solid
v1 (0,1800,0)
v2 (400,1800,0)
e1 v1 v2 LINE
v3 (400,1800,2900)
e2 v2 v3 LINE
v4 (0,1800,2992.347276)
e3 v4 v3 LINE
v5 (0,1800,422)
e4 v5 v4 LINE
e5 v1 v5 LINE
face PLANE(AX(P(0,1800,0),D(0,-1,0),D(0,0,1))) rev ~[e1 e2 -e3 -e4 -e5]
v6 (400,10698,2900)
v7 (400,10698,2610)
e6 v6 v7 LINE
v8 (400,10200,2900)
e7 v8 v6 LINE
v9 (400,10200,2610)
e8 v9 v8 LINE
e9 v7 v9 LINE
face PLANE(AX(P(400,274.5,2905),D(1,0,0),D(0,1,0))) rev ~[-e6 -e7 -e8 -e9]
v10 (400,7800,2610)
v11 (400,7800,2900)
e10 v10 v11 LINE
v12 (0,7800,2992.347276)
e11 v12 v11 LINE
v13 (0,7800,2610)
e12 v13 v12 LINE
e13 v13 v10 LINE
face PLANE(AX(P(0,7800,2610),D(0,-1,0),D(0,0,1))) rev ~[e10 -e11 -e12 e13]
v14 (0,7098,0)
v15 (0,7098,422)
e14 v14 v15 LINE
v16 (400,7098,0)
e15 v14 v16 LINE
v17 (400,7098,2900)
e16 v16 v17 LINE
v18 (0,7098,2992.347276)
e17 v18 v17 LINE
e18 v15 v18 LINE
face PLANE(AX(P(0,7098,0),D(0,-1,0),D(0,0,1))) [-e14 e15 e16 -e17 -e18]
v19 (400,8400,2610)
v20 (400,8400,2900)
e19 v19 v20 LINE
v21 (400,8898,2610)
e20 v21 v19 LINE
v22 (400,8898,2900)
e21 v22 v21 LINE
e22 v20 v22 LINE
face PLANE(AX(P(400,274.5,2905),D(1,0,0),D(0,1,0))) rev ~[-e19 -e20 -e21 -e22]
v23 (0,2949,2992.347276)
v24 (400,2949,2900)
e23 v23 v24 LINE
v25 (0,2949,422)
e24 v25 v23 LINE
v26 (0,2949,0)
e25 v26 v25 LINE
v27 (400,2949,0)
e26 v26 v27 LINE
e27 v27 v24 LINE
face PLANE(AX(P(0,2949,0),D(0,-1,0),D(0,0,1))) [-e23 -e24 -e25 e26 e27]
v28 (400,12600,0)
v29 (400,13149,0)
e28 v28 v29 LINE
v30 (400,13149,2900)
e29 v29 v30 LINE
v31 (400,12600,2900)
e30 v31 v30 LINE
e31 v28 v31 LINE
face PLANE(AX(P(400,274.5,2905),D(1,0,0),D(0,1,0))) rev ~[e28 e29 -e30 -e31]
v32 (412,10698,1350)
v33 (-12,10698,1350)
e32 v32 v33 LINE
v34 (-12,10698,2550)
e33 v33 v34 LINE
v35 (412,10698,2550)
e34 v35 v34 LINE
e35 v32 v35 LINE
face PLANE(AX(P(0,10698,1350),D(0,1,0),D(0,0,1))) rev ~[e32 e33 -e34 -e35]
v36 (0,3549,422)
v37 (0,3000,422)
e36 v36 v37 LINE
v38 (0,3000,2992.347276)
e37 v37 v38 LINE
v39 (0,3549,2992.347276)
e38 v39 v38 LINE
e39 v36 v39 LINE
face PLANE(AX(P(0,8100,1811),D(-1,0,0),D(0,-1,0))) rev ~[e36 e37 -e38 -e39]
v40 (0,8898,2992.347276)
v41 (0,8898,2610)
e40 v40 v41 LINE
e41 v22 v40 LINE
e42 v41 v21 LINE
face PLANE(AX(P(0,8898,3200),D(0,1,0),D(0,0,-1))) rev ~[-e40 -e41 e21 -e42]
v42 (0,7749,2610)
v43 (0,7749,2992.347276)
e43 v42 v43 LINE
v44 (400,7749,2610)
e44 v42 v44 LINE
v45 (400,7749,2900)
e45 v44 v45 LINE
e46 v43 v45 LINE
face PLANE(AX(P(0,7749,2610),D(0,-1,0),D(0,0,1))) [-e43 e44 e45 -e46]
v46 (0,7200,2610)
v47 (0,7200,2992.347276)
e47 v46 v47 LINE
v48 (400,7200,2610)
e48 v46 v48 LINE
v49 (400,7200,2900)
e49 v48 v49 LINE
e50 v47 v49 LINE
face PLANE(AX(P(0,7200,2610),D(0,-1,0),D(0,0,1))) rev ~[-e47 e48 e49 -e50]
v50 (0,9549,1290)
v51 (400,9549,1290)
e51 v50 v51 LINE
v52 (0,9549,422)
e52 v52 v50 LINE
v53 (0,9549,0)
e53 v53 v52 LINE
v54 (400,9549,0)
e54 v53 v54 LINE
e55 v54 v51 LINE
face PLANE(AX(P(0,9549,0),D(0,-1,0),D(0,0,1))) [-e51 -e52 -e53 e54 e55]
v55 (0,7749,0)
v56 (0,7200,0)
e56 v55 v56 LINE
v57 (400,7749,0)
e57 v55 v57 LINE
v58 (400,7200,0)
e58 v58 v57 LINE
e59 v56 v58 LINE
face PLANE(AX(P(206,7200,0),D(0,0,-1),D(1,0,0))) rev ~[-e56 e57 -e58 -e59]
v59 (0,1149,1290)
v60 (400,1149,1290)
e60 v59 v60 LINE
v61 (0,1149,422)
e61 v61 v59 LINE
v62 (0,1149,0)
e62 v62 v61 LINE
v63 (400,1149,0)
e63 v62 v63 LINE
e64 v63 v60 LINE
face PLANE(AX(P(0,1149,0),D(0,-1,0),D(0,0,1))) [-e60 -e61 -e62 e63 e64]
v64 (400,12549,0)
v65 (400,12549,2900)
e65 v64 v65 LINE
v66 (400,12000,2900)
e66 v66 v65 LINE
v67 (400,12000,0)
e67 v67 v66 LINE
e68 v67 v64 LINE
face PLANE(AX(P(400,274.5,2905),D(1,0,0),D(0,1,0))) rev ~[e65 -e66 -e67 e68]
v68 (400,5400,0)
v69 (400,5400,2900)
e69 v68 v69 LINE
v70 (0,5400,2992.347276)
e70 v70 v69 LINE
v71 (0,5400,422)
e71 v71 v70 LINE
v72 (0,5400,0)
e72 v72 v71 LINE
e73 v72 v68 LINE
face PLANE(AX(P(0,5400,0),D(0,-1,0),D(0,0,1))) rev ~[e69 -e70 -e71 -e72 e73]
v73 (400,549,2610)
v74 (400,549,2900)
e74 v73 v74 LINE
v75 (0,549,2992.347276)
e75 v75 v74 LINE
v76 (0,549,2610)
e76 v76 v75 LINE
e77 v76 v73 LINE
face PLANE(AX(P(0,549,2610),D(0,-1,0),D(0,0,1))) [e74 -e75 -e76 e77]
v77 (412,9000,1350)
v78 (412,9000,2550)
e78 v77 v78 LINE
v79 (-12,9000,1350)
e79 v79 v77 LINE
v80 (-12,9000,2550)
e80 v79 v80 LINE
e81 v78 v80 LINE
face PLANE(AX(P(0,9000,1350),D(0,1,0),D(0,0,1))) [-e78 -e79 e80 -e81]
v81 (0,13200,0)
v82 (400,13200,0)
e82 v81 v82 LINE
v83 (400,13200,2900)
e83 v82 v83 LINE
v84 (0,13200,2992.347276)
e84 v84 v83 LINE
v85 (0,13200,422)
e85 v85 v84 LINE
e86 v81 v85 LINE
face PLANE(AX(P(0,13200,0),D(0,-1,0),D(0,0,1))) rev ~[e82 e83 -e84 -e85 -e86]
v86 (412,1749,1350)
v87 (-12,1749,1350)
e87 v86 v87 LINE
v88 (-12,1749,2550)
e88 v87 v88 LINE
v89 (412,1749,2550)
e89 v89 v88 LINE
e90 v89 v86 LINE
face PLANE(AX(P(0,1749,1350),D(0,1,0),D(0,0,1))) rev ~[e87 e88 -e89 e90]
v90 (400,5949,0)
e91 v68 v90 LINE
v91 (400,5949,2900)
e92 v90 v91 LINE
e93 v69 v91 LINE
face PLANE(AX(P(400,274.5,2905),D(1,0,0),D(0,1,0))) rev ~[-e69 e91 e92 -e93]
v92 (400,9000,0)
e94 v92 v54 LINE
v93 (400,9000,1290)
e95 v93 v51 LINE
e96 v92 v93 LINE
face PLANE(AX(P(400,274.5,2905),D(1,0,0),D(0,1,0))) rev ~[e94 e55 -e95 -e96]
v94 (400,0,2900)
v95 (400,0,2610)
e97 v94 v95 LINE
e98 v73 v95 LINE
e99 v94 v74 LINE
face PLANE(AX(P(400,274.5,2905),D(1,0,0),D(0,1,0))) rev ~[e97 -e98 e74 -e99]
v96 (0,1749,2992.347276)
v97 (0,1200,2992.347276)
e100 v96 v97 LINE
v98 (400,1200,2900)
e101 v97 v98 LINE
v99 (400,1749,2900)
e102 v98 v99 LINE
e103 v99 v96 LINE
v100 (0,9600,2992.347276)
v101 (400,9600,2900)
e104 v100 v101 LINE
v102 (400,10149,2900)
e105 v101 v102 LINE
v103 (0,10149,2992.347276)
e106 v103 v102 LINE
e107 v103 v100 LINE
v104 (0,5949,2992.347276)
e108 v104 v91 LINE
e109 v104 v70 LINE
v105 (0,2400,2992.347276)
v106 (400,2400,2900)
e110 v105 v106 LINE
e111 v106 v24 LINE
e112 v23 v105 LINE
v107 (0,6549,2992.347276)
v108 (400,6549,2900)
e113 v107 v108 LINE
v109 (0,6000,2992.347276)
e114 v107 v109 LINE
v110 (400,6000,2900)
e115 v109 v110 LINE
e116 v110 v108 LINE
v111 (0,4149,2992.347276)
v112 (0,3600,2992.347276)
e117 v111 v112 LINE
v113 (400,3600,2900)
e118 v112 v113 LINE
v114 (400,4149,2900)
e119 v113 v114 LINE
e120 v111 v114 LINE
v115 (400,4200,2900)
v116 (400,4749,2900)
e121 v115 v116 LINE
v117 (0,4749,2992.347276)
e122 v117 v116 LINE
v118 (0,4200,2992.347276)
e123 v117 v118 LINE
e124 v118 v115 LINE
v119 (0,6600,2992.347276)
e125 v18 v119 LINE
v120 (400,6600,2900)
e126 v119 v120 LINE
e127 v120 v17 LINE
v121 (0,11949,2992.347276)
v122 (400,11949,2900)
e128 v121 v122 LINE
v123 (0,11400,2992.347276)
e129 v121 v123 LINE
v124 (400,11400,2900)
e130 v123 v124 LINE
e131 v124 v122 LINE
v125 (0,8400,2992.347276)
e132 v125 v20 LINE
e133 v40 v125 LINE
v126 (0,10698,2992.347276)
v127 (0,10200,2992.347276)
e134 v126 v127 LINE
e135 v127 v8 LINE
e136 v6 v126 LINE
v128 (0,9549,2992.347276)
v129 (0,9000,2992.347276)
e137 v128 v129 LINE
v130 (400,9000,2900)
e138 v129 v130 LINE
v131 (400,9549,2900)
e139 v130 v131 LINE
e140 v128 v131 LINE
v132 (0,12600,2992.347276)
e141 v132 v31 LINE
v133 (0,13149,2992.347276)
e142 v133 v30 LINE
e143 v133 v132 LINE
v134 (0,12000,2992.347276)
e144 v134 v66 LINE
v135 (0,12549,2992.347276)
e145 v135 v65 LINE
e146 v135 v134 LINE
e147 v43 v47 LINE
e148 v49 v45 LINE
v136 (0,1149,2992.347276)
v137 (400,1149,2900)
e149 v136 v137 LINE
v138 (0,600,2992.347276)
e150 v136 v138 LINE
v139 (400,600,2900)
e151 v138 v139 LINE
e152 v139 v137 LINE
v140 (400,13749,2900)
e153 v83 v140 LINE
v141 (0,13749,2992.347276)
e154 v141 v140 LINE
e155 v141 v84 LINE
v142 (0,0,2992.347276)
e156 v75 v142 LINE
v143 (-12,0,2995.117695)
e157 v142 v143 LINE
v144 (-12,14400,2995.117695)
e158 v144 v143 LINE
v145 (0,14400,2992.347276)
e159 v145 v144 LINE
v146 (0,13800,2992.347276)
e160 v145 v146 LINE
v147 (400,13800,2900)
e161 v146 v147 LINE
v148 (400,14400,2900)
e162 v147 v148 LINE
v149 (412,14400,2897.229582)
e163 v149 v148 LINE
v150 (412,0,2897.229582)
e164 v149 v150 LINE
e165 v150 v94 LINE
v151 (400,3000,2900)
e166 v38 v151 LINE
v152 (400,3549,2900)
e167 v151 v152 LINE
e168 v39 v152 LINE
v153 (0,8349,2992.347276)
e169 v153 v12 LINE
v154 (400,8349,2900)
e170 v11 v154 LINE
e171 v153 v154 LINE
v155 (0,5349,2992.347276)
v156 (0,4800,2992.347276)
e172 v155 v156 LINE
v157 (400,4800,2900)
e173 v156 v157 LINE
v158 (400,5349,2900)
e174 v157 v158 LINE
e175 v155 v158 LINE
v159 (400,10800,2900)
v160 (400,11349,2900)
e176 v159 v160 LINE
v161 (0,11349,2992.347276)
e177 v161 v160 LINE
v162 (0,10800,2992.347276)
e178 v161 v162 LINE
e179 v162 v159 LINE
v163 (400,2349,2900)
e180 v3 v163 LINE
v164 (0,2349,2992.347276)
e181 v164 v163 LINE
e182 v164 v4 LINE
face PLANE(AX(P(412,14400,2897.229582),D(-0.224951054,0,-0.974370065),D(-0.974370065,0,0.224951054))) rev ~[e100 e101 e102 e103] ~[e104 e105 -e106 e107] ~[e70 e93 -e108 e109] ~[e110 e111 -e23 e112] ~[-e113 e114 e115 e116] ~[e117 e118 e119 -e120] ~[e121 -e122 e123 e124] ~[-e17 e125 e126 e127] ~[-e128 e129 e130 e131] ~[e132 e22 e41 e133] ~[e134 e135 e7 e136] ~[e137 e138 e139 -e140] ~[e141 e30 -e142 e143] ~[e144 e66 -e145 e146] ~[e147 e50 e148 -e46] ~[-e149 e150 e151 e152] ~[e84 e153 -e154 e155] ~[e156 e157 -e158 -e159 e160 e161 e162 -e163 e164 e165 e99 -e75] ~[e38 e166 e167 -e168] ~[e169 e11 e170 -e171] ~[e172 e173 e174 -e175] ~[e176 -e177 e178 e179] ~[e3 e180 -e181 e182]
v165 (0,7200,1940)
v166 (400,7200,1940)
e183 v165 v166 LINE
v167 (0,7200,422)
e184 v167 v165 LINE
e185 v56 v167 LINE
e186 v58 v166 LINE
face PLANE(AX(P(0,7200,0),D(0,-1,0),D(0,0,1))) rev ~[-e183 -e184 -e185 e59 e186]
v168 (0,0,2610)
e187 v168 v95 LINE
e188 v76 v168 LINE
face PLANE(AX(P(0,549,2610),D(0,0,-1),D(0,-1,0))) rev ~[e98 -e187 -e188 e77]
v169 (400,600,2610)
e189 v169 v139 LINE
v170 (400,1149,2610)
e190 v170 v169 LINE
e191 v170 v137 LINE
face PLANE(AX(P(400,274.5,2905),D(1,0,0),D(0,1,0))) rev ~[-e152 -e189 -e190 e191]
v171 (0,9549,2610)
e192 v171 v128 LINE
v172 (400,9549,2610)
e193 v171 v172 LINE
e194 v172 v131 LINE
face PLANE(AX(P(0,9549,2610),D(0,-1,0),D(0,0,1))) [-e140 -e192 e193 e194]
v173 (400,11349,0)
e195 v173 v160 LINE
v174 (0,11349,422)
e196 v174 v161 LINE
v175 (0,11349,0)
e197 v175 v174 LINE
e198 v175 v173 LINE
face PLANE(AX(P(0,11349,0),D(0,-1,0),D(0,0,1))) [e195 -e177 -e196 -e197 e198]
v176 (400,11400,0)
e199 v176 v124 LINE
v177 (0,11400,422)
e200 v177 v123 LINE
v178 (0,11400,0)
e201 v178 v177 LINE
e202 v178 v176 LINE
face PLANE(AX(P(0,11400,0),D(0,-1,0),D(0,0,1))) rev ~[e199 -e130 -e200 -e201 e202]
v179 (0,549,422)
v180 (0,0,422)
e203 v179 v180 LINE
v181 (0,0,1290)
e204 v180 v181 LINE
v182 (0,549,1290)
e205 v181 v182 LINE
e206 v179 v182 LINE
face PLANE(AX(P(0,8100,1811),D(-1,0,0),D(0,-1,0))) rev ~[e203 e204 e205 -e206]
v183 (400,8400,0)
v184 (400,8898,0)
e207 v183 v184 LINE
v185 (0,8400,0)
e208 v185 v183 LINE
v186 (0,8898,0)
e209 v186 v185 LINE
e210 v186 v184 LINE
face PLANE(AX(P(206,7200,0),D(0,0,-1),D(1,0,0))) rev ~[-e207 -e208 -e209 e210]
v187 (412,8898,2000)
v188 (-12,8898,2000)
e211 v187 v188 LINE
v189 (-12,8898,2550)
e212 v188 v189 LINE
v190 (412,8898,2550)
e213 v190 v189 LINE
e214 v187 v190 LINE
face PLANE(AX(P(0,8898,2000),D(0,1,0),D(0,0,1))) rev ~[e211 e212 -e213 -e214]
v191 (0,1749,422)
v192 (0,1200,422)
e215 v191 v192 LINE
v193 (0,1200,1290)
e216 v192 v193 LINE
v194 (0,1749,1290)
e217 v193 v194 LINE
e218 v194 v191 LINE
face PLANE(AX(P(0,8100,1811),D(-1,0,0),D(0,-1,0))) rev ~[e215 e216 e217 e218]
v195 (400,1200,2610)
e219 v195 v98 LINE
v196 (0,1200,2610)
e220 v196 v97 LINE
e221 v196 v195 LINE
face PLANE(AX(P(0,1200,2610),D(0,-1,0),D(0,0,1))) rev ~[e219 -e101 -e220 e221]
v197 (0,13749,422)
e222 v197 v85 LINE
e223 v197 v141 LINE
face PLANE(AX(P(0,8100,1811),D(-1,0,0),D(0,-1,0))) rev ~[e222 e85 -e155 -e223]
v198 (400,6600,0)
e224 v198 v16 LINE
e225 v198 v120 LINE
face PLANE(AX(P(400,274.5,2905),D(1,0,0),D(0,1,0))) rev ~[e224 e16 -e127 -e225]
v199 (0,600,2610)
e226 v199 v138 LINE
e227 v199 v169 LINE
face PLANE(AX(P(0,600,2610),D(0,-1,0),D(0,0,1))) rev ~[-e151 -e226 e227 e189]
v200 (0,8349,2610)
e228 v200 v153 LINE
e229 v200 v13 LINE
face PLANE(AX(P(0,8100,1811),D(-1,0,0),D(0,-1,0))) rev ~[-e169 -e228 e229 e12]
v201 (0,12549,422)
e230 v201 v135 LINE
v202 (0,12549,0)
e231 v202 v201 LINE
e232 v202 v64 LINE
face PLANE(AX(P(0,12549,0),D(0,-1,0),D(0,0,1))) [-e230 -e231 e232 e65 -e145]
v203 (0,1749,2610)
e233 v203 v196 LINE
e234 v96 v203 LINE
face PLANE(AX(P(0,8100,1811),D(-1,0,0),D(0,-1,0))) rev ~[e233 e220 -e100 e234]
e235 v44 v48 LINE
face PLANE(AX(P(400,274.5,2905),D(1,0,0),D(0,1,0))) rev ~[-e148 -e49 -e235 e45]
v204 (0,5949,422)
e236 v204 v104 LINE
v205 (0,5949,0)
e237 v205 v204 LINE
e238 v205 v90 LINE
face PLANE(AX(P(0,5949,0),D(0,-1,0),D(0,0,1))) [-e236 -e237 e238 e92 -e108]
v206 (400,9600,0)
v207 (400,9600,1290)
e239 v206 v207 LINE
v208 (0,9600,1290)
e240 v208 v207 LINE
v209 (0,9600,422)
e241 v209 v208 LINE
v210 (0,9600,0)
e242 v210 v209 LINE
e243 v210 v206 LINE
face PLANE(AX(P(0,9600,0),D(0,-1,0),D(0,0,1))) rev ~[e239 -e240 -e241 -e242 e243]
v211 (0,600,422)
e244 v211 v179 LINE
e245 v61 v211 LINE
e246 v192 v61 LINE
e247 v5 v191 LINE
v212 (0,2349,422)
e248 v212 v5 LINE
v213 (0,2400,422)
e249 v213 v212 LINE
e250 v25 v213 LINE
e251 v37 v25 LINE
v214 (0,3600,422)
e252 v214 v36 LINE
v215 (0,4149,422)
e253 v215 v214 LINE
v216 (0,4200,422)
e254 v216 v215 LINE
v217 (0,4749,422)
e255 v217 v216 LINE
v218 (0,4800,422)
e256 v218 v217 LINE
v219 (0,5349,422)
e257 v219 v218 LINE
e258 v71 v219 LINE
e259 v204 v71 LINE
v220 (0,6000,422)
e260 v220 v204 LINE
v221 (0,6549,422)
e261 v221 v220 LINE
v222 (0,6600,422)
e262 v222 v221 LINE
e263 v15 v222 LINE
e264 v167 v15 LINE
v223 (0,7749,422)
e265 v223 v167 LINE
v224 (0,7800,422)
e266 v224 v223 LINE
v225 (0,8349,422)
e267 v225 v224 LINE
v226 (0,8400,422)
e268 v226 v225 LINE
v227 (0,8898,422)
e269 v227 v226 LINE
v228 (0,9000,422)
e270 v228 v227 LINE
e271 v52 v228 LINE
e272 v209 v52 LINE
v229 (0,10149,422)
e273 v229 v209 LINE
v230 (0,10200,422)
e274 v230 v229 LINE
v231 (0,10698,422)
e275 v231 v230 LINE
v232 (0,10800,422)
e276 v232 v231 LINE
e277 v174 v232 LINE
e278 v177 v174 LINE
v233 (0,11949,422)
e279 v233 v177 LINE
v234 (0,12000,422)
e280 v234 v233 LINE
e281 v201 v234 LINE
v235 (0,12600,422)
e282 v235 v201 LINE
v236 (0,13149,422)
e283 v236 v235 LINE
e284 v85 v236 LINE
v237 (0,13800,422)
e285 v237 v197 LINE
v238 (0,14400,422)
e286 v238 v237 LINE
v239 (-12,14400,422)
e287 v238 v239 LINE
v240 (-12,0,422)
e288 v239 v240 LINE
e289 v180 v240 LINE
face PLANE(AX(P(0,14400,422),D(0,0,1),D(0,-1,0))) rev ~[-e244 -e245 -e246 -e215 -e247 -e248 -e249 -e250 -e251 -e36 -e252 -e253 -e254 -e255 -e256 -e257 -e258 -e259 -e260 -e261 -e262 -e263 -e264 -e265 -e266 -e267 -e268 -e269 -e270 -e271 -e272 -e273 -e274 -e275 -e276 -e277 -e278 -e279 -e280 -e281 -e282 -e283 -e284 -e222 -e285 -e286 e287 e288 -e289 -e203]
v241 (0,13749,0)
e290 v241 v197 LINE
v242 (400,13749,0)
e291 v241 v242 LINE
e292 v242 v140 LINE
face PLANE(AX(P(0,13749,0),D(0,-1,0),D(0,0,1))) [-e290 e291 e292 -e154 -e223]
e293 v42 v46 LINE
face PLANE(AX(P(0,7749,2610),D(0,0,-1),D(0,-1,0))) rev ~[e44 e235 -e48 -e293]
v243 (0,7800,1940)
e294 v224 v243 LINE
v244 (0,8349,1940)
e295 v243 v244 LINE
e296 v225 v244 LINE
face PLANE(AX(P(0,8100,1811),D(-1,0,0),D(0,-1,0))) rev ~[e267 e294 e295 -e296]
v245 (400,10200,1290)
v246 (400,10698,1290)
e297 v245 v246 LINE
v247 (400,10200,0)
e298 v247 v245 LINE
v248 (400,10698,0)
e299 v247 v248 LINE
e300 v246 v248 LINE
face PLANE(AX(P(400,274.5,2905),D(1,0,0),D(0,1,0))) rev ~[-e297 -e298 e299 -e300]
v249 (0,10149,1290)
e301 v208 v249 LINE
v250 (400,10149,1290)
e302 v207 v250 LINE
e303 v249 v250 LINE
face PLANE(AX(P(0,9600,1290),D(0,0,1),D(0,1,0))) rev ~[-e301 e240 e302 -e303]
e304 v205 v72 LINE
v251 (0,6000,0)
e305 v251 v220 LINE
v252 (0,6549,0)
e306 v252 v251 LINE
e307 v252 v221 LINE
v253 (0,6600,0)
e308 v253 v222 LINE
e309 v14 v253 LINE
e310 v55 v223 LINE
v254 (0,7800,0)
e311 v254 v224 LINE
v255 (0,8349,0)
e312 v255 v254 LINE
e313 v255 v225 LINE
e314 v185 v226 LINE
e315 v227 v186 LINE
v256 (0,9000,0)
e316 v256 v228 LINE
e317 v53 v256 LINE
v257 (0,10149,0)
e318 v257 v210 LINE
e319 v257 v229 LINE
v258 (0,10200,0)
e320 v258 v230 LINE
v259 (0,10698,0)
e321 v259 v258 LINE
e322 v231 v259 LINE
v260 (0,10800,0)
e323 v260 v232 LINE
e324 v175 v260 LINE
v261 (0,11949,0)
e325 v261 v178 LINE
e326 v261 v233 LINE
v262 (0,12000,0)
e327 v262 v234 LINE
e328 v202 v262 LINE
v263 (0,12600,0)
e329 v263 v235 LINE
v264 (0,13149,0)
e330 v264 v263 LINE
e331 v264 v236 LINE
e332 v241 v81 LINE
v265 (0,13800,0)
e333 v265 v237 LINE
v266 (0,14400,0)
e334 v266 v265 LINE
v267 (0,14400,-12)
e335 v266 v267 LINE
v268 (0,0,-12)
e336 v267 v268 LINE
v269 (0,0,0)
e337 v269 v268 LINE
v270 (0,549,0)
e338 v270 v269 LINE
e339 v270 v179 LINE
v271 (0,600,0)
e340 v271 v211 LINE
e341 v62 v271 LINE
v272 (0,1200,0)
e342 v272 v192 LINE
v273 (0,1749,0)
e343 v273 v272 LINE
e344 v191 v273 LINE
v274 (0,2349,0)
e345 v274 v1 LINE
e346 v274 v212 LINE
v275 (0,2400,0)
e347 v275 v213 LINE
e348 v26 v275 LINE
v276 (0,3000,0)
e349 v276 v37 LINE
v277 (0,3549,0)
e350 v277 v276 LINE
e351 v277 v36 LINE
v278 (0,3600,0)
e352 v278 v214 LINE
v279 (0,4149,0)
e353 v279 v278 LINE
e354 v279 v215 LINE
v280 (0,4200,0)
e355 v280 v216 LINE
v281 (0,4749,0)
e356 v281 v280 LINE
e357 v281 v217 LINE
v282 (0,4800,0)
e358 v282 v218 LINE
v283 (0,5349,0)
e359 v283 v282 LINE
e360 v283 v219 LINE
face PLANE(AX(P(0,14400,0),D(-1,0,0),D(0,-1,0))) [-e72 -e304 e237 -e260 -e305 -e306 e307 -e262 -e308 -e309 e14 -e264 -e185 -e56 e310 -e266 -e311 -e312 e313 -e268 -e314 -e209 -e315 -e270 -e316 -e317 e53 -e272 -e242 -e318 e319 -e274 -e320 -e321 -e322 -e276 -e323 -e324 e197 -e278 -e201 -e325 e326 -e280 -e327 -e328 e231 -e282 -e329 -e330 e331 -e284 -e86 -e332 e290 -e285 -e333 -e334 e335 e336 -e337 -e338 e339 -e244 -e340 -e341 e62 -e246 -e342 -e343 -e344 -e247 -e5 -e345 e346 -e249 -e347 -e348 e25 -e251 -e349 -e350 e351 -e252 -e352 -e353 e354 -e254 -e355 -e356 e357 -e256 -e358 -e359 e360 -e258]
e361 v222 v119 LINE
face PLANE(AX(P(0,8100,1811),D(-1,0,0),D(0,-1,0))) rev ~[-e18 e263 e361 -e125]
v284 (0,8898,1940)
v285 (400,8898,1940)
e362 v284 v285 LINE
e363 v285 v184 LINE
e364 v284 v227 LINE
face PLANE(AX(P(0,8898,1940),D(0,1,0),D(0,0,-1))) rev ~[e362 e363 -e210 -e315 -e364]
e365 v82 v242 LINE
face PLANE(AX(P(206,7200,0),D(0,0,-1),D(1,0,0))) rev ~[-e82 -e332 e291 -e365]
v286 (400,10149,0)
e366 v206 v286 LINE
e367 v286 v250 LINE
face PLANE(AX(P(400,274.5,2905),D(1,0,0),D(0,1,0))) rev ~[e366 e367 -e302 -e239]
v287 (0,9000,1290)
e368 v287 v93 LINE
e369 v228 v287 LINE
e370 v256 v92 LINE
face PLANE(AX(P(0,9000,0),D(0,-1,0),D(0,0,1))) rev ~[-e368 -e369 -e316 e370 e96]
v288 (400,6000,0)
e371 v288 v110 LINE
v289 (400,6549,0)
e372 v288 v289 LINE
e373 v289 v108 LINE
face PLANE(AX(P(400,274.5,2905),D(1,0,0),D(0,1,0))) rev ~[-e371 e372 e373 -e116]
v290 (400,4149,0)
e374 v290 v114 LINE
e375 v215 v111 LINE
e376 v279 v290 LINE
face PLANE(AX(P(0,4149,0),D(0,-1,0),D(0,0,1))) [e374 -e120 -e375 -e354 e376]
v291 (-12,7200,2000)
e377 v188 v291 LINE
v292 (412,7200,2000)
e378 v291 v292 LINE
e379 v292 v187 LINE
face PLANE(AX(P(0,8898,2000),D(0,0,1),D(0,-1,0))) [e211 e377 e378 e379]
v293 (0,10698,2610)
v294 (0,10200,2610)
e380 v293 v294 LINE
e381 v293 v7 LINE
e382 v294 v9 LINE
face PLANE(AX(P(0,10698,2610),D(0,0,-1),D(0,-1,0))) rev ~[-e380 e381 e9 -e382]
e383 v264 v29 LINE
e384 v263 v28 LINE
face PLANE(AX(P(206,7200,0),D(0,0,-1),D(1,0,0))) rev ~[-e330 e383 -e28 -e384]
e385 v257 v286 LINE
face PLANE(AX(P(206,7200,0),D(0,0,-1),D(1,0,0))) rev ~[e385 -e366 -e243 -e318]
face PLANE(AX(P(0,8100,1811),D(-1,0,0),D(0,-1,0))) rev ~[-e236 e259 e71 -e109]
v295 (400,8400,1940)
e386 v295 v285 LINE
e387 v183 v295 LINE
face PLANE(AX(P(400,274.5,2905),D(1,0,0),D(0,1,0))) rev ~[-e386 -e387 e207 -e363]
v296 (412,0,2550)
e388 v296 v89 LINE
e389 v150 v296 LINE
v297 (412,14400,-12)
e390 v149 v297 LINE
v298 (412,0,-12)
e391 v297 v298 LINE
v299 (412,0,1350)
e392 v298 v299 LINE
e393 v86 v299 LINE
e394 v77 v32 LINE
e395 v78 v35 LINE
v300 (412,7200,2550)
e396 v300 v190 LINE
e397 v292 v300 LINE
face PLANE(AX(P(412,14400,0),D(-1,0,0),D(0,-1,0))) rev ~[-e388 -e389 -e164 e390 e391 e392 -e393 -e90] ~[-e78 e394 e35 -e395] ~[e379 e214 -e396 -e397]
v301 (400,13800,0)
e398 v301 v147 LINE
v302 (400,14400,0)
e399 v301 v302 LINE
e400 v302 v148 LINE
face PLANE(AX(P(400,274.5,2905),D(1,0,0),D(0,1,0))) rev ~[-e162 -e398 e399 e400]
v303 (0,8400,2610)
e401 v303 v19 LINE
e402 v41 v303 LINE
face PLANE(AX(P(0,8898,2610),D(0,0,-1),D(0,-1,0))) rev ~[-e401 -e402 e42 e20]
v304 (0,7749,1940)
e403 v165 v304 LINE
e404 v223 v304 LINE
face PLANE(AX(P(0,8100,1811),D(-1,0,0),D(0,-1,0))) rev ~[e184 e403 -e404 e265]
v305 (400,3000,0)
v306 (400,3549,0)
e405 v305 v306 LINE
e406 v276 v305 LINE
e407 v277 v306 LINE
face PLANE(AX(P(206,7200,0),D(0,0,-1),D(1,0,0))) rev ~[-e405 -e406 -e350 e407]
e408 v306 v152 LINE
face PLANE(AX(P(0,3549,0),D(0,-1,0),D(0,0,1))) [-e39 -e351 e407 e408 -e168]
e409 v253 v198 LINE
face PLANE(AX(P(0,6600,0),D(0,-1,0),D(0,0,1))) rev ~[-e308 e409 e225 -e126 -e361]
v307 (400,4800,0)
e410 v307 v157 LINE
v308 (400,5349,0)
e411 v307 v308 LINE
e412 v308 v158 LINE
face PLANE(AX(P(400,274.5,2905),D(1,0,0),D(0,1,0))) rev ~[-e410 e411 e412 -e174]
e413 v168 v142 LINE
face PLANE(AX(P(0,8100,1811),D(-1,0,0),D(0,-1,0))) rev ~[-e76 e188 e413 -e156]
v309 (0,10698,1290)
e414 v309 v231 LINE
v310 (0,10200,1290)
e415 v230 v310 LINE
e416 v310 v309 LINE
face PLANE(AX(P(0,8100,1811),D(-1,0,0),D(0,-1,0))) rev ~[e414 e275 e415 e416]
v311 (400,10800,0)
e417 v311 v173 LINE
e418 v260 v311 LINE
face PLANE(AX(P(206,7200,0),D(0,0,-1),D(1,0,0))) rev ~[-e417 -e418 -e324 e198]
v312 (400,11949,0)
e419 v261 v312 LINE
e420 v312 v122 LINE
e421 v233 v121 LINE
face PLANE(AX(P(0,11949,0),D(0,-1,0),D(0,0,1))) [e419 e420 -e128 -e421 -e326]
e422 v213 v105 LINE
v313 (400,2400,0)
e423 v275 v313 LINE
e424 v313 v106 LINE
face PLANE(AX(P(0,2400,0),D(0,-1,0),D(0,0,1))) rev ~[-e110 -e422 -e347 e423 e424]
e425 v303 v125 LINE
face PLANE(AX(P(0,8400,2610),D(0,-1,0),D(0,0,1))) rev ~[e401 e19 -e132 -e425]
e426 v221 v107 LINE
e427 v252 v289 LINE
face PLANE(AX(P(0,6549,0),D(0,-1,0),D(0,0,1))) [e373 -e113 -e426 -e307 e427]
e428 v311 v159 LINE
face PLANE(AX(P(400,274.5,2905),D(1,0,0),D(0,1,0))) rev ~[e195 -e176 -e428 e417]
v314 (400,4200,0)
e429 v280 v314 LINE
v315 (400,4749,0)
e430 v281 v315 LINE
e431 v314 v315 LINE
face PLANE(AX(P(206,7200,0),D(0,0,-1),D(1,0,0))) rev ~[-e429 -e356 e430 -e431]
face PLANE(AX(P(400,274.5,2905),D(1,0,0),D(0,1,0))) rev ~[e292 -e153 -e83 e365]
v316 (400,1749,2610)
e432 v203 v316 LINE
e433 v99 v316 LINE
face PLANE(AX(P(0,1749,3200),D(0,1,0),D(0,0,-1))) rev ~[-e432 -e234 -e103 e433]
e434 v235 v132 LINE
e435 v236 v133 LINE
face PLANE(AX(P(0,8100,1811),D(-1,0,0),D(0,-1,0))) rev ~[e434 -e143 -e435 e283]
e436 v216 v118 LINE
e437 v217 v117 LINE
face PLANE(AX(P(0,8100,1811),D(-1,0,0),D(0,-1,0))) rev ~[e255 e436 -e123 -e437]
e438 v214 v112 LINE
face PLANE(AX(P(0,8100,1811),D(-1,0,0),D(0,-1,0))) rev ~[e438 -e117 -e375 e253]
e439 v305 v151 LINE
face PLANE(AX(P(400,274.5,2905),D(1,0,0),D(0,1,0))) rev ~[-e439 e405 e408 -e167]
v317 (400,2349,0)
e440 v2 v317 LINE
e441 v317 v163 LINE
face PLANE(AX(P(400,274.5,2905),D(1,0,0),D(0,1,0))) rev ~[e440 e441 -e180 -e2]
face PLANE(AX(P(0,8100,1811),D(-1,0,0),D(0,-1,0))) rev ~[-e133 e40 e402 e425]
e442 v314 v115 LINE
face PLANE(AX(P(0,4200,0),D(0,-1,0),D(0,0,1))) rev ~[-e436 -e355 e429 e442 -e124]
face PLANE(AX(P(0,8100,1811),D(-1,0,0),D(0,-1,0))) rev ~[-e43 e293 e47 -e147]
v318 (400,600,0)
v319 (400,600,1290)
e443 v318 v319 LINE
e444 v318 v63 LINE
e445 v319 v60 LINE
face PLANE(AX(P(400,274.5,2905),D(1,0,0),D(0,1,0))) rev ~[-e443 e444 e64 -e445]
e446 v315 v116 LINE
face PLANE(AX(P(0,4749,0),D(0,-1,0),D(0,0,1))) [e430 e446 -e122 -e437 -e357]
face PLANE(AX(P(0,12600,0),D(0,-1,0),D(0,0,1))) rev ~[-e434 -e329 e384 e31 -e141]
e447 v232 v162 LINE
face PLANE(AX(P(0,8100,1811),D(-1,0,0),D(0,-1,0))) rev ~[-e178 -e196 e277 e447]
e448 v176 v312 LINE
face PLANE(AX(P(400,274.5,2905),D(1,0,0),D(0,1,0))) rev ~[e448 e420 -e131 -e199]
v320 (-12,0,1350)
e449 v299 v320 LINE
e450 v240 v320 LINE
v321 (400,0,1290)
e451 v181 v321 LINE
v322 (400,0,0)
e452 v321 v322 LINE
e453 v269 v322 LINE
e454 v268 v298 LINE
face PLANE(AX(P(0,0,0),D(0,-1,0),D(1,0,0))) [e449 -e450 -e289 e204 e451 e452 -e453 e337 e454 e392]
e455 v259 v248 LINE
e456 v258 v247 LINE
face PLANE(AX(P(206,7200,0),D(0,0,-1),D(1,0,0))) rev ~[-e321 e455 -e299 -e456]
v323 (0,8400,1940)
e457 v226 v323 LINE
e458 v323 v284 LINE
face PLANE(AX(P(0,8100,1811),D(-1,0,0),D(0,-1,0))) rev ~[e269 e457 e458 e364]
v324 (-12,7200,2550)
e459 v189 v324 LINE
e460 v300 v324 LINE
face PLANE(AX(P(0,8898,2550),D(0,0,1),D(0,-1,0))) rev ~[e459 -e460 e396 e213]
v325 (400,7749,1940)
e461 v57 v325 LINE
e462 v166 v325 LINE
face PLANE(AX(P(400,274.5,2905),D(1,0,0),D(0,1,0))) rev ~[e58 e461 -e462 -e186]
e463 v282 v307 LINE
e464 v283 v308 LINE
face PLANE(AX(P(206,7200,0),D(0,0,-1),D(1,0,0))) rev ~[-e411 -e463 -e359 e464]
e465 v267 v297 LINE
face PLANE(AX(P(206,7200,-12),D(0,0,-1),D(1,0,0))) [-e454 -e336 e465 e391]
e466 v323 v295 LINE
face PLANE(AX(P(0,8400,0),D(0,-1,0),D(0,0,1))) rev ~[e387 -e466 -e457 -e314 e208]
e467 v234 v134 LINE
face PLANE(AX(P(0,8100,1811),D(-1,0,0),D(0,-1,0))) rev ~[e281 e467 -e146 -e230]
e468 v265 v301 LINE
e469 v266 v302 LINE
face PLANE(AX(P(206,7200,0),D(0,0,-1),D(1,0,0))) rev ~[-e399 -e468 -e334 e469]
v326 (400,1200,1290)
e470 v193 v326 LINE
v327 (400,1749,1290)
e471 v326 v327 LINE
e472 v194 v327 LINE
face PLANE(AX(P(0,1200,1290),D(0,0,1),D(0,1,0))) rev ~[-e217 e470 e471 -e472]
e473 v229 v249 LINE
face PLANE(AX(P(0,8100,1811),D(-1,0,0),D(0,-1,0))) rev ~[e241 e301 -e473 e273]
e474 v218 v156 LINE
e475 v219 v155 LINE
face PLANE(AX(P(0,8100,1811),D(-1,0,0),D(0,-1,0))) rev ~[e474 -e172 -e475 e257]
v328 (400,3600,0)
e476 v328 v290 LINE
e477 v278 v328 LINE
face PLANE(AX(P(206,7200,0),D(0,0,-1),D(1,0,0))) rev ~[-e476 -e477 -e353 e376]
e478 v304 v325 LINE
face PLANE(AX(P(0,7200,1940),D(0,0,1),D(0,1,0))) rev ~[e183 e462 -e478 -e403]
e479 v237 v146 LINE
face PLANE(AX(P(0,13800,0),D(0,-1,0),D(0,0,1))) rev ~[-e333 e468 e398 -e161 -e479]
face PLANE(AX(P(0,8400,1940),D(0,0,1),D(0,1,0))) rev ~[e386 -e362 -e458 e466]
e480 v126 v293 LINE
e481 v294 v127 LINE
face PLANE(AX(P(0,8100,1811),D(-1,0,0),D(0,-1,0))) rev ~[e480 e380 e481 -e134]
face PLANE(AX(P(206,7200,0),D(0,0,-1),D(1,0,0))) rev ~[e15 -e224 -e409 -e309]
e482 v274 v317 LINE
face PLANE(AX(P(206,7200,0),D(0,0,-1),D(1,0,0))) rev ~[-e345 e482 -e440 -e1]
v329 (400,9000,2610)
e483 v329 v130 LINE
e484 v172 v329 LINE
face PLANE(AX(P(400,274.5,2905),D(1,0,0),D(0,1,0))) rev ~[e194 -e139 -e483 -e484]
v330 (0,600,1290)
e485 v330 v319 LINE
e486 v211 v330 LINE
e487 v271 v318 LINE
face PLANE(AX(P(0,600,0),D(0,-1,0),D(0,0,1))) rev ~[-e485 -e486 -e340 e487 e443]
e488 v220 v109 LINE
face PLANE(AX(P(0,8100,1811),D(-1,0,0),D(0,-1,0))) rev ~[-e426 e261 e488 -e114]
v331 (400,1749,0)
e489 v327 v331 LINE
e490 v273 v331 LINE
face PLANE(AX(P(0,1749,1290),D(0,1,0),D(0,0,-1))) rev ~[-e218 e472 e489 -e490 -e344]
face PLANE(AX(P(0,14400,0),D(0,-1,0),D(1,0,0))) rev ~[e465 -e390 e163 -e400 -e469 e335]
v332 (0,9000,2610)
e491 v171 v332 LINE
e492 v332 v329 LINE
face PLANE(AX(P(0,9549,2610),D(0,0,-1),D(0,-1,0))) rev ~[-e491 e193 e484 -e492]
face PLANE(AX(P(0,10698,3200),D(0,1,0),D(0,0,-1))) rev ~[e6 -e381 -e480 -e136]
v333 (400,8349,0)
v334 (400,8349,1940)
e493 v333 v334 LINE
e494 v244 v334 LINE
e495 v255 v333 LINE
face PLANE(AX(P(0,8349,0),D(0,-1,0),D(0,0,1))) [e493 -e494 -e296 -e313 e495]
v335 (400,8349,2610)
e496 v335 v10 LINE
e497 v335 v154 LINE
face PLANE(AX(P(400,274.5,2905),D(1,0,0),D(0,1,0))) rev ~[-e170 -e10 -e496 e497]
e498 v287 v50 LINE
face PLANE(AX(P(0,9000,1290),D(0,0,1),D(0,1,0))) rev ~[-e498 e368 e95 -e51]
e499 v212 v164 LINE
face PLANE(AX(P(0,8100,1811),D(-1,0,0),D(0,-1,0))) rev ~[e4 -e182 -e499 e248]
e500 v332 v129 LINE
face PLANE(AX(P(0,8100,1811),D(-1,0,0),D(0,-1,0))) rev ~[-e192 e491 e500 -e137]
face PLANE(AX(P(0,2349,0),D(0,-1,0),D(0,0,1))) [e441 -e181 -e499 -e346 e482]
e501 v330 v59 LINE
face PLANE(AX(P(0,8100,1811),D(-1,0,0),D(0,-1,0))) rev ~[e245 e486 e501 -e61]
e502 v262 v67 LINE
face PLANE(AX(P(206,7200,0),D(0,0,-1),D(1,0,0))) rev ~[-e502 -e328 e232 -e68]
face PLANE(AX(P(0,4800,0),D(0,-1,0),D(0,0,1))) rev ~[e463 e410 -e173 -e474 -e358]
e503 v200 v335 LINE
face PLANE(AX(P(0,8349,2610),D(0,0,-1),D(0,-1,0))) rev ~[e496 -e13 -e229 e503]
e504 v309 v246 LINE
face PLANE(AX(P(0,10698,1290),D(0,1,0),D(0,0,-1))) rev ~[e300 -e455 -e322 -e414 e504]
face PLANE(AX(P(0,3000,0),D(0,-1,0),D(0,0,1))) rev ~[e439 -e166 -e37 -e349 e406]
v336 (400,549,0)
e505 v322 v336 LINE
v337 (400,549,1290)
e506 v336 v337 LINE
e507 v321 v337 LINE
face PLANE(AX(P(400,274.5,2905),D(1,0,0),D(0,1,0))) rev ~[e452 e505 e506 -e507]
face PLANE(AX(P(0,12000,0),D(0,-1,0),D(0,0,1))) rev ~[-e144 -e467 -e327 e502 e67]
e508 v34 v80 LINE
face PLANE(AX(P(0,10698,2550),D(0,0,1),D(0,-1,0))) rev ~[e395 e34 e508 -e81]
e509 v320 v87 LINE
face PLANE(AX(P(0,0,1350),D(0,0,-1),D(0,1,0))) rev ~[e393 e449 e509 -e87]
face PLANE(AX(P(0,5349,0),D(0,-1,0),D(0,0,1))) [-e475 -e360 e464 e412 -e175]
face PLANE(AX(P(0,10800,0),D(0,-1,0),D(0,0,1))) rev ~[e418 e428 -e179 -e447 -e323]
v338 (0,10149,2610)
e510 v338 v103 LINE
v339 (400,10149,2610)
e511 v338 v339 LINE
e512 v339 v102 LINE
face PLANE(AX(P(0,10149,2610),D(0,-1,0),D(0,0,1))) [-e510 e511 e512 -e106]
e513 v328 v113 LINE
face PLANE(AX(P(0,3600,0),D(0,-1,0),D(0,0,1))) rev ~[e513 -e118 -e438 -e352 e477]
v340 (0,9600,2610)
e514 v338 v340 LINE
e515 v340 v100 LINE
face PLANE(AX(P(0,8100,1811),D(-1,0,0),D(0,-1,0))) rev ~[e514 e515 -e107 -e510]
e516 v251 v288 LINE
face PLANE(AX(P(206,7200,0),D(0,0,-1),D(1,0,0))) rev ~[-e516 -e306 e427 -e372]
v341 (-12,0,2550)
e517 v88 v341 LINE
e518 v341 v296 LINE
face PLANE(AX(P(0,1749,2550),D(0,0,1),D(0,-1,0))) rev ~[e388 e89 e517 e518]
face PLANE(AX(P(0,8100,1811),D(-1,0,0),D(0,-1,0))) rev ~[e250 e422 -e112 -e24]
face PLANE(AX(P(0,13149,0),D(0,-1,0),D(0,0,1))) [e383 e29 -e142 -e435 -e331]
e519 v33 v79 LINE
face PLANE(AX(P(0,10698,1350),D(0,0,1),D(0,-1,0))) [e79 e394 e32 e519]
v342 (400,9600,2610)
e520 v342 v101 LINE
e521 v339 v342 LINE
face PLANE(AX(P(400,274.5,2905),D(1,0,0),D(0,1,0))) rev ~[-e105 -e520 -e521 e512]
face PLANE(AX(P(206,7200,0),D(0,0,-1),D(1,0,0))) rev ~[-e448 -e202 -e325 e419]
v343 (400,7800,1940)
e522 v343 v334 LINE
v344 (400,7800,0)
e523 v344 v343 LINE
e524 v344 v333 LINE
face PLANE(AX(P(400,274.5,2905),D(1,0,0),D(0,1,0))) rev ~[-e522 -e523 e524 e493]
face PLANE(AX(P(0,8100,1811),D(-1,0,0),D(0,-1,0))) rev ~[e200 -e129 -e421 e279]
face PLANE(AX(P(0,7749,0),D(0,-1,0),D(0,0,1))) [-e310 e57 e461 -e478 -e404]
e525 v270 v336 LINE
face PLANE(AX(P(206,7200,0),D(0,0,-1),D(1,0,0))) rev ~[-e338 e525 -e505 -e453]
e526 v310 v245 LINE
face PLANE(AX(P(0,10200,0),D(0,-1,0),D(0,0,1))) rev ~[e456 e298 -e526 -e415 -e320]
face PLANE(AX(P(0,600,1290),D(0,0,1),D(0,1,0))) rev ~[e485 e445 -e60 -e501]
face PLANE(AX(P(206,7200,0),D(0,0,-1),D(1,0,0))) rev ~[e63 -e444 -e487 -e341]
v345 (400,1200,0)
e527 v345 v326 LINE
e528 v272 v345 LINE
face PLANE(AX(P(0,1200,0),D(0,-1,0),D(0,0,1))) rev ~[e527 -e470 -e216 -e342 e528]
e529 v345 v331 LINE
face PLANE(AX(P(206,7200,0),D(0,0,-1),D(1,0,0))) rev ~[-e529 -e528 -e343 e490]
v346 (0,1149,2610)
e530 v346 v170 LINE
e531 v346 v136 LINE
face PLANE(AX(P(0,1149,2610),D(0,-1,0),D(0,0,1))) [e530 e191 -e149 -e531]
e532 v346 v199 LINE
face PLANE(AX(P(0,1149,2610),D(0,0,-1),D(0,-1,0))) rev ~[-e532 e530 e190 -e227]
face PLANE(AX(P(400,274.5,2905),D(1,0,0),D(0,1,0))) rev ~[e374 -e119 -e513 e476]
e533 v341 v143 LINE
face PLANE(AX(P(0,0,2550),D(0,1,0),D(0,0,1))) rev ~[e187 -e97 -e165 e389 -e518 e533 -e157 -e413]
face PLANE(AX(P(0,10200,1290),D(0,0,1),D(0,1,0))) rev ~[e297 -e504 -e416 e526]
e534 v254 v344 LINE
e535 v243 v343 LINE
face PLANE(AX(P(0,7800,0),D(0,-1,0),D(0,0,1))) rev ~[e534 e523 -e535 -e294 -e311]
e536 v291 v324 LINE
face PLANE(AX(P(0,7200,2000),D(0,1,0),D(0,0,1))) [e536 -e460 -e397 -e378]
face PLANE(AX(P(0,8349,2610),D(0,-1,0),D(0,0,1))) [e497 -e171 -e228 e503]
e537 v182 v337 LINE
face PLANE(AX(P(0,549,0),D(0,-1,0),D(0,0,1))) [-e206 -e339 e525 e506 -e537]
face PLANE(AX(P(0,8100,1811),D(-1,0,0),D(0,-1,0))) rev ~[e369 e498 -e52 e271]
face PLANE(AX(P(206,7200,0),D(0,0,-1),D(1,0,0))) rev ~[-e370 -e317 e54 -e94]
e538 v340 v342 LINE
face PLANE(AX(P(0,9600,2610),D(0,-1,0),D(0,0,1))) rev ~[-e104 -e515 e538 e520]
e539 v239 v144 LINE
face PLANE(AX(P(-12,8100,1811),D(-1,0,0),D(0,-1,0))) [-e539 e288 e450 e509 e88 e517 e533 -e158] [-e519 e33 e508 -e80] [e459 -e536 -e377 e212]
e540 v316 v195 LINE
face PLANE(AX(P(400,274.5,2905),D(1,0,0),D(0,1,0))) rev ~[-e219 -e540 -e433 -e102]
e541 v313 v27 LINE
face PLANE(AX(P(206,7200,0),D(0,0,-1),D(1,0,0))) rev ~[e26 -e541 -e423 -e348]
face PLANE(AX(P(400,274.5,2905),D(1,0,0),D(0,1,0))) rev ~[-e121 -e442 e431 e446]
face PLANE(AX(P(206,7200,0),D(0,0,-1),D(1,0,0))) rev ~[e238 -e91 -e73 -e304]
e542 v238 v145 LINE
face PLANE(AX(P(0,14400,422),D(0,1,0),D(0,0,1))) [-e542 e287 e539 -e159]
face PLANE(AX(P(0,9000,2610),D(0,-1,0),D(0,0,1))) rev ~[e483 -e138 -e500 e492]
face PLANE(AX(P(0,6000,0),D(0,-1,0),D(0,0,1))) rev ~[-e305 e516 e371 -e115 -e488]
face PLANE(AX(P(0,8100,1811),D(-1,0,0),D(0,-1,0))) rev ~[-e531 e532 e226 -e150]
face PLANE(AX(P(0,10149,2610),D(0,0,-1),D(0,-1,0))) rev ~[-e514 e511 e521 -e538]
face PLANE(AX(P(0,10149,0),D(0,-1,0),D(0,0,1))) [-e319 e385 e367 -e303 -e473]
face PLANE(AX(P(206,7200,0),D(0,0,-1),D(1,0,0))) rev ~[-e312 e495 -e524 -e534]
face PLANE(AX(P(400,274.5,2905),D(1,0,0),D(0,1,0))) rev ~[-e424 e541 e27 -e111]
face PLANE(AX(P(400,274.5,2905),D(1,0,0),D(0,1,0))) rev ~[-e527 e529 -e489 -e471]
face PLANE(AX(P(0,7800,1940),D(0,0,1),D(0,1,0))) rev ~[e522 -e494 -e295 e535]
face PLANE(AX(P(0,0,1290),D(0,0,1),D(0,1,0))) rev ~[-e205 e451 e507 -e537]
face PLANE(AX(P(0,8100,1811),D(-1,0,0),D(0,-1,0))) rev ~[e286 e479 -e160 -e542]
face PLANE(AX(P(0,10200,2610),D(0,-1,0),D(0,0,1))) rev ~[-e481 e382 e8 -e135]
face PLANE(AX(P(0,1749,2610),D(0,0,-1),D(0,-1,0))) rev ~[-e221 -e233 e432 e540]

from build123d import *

# Parameters (mm, degrees)
F0_W     = 51
F0_H     = 590
F0_H_2   = 1290
F1_DEPTH = 400
F0_H_3   = 3200
F0_H_4   = 1940
F2_W     = 549
F2_H     = 590
F2_H_2   = 1290
F2_W_2   = 12600
F2_H_3   = 3200
F2_W_3   = 1698
F2_H_4   = 1200
F2_H_5   = 550
F3_DEPTH = 12
F4_W     = 12600
F4_H     = 2778
F4_W_2   = 1698
F4_H_2   = 1200
F4_H_3   = 550
F4_W_3   = 549
F4_H_4   = 590
F4_H_5   = 868
F5_DEPTH = 12
F7_DEPTH = 14400.001
F8_W     = 412
F8_H     = 14400
F9_DEPTH = 12


# Not quite as in the source:
# - a feature names something its author has since deleted; it is built from what else it names


with BuildPart() as f1:
    # F0 (on Right) → F1 (new body)
    with BuildSketch(Plane.YZ):
        with Locations((574.5, 2905)):
            Rectangle(F0_W, F0_H)
        with Locations((1174.5, 2905)):
            Rectangle(F0_W, F0_H)
        Polygon((1749, 2550), (1749, 1350), (1749, 1290), (1749, 0), (1800, 0), (1800, 3200), (1749, 3200), (1749, 2610), align=None)
        Polygon((0, 2610), (0, 2550), (1740, 2550), (1749, 2550), (1749, 2610), (1200, 2610), (1149, 2610), (600, 2610), (549, 2610), align=None)
        Polygon((0, 1350), (0, 1290), (549, 1290), (600, 1290), (1149, 1290), (1200, 1290), (1749, 1290), (1749, 1350), (1740, 1350), align=None)
        with Locations((1174.5, 645)):
            Rectangle(F0_W, F0_H_2)
        with Locations((574.5, 645)):
            Rectangle(F0_W, F0_H_2)
    extrude(amount=F1_DEPTH)



with BuildPart() as f1b:
    # F0 (on Right) → F1, piece 2 (new body)
    with BuildSketch(Plane.YZ):
        with Locations((2374.5, 1600)):
            Rectangle(F0_W, F0_H_3)
    extrude(amount=F1_DEPTH)


with BuildPart() as f1c:
    # F0 (on Right) → F1, piece 3 (new body)
    with BuildSketch(Plane.YZ):
        with Locations((2974.5, 1600)):
            Rectangle(F0_W, F0_H_3)
    extrude(amount=F1_DEPTH)


with BuildPart() as f1d:
    # F0 (on Right) → F1, piece 4 (new body)
    with BuildSketch(Plane.YZ):
        with Locations((3574.5, 1600)):
            Rectangle(F0_W, F0_H_3)
    extrude(amount=F1_DEPTH)


with BuildPart() as f1e:
    # F0 (on Right) → F1, piece 5 (new body)
    with BuildSketch(Plane.YZ):
        with Locations((4174.5, 1600)):
            Rectangle(F0_W, F0_H_3)
    extrude(amount=F1_DEPTH)


with BuildPart() as f1f:
    # F0 (on Right) → F1, piece 6 (new body)
    with BuildSketch(Plane.YZ):
        with Locations((4774.5, 1600)):
            Rectangle(F0_W, F0_H_3)
    extrude(amount=F1_DEPTH)


with BuildPart() as f1g:
    # F0 (on Right) → F1, piece 7 (new body)
    with BuildSketch(Plane.YZ):
        with Locations((5374.5, 1600)):
            Rectangle(F0_W, F0_H_3)
    extrude(amount=F1_DEPTH)


with BuildPart() as f1h:
    # F0 (on Right) → F1, piece 8 (new body)
    with BuildSketch(Plane.YZ):
        with Locations((5974.5, 1600)):
            Rectangle(F0_W, F0_H_3)
    extrude(amount=F1_DEPTH)


with BuildPart() as f1i:
    # F0 (on Right) → F1, piece 9 (new body)
    with BuildSketch(Plane.YZ):
        with Locations((6574.5, 1600)):
            Rectangle(F0_W, F0_H_3)
    extrude(amount=F1_DEPTH)


with BuildPart() as f1j:
    # F0 (on Right) → F1, piece 10 (new body)
    with BuildSketch(Plane.YZ):
        with Locations((7774.5, 2905)):
            Rectangle(F0_W, F0_H)
        with Locations((8374.5, 2905)):
            Rectangle(F0_W, F0_H)
        with Locations((9574.5, 2905)):
            Rectangle(F0_W, F0_H)
        with Locations((10174.5, 2905)):
            Rectangle(F0_W, F0_H)
        with Locations((10774.5, 1600)):
            Rectangle(F0_W, F0_H_3)
        Polygon((7149, 3200), (7149, 0), (7200, 0), (7200, 1940), (7749, 1940), (7800, 1940), (8349, 1940), (8400, 1940), (8898, 1940), (8898, 2000), (7200, 2000), (7200, 2550), (7200, 2610), (7200, 3200), align=None)
        with Locations((7774.5, 970)):
            Rectangle(F0_W, F0_H_4)
        Polygon((9549, 2610), (9000, 2610), (9000, 2550), (10698, 2550), (10698, 2610), (10200, 2610), (10149, 2610), (9600, 2610), align=None)
        Polygon((8949, 3200), (8949, 0), (9000, 0), (9000, 1290), (9000, 1350), (9000, 2550), (9000, 2610), (9000, 3200), align=None)
        with Locations((9574.5, 645)):
            Rectangle(F0_W, F0_H_2)
        with Locations((7123.5, 1600)):
            Rectangle(F0_W, F0_H_3)
        Polygon((7749, 2610), (7200, 2610), (7200, 2550), (8898, 2550), (8898, 2610), (8400, 2610), (8349, 2610), (7800, 2610), align=None)
        Polygon((9000, 1350), (9000, 1290), (9549, 1290), (9600, 1290), (10149, 1290), (10200, 1290), (10698, 1290), (10698, 1350), align=None)
        Polygon((8898, 2610), (8898, 2550), (8898, 2000), (8898, 1940), (8898, 0), (8949, 0), (8949, 3200), (8898, 3200), align=None)
        with Locations((10174.5, 645)):
            Rectangle(F0_W, F0_H_2)
        Polygon((10698, 2550), (10698, 1350), (10698, 1290), (10698, 0), (10749, 0), (10749, 3200), (10698, 3200), (10698, 2610), align=None)
        with Locations((8374.5, 970)):
            Rectangle(F0_W, F0_H_4)
    extrude(amount=F1_DEPTH)


with BuildPart() as f1k:
    # F0 (on Right) → F1, piece 11 (new body)
    with BuildSketch(Plane.YZ):
        with Locations((11374.5, 1600)):
            Rectangle(F0_W, F0_H_3)
    extrude(amount=F1_DEPTH)


with BuildPart() as f1l:
    # F0 (on Right) → F1, piece 12 (new body)
    with BuildSketch(Plane.YZ):
        with Locations((11974.5, 1600)):
            Rectangle(F0_W, F0_H_3)
    extrude(amount=F1_DEPTH)


with BuildPart() as f1m:
    # F0 (on Right) → F1, piece 13 (new body)
    with BuildSketch(Plane.YZ):
        with Locations((12574.5, 1600)):
            Rectangle(F0_W, F0_H_3)
    extrude(amount=F1_DEPTH)


with BuildPart() as f1n:
    # F0 (on Right) → F1, piece 14 (new body)
    with BuildSketch(Plane.YZ):
        with Locations((13174.5, 1600)):
            Rectangle(F0_W, F0_H_3)
    extrude(amount=F1_DEPTH)


with BuildPart() as f1o:
    # F0 (on Right) → F1, piece 15 (new body)
    with BuildSketch(Plane.YZ):
        with Locations((13774.5, 1600)):
            Rectangle(F0_W, F0_H_3)
    extrude(amount=F1_DEPTH)


with BuildPart() as f1_1:
    add(f1.part)

    add(f1b.part)  # F3 merges F1b

    add(f1c.part)  # F3 merges F1c

    add(f1d.part)  # F3 merges F1d

    add(f1e.part)  # F3 merges F1e

    add(f1f.part)  # F3 merges F1f

    add(f1g.part)  # F3 merges F1g

    add(f1h.part)  # F3 merges F1h

    add(f1i.part)  # F3 merges F1i

    add(f1j.part)  # F3 merges F1j

    add(f1k.part)  # F3 merges F1k

    add(f1l.part)  # F3 merges F1l

    add(f1m.part)  # F3 merges F1m

    add(f1n.part)  # F3 merges F1n

    add(f1o.part)  # F3 merges F1o
    # F2 (on face) → F3 (join)
    with BuildSketch(Plane.YZ.offset(400)):
        with Locations((274.5, 2905)):
            Rectangle(F2_W, F2_H)
        Polygon((600, 3200), (549, 3200), (549, 2610), (0, 2610), (0, 2550), (1749, 2550), (1749, 1350), (0, 1350), (0, 1290), (549, 1290), (549, 0), (600, 0), (600, 1290), (1149, 1290), (1149, 0), (1200, 0), (1200, 1290), (1749, 1290), (1749, 0), (1800, 0), (1800, 3200), (1749, 3200), (1749, 2610), (1200, 2610), (1200, 3200), (1149, 3200), (1149, 2610), (600, 2610), align=None)
        with Locations((874.5, 2905)):
            Rectangle(F2_W, F2_H)
        with Locations((1474.5, 2905)):
            Rectangle(F2_W, F2_H)
        with Locations((274.5, 645)):
            Rectangle(F2_W, F2_H_2)
        with Locations((8100, 1600)):
            Rectangle(F2_W_2, F2_H_3)
        with Locations((9849, 1950)):
            Rectangle(F2_W_3, F2_H_4, mode=Mode.SUBTRACT)
        with Locations((8049, 2275)):
            Rectangle(F2_W_3, F2_H_5, mode=Mode.SUBTRACT)
        with Locations((874.5, 645)):
            Rectangle(F2_W, F2_H_2)
        with Locations((1474.5, 645)):
            Rectangle(F2_W, F2_H_2)
    extrude(amount=F3_DEPTH)

    # F4 (on face) → F5 (join)
    with BuildSketch(Plane(origin=(0, 0, 0), x_dir=(0, -1, 0), z_dir=(-1, 0, 0))):
        with Locations((-8100, 1811)):
            Rectangle(F4_W, F4_H)
        with Locations((-9849, 1950)):
            Rectangle(F4_W_2, F4_H_2, mode=Mode.SUBTRACT)
        with Locations((-8049, 2275)):
            Rectangle(F4_W_2, F4_H_3, mode=Mode.SUBTRACT)
        Polygon((-1749, 3200), (-1800, 3200), (-1800, 422), (-1749, 422), (-1749, 1290), (-1200, 1290), (-1200, 422), (-1149, 422), (-1149, 1290), (-600, 1290), (-600, 422), (-549, 422), (-549, 1290), (0, 1290), (0, 1350), (-1749, 1350), (-1749, 2550), (0, 2550), (0, 2610), (-549, 2610), (-549, 3200), (-600, 3200), (-600, 2610), (-1149, 2610), (-1149, 3200), (-1200, 3200), (-1200, 2610), (-1749, 2610), align=None)
        with Locations((-1474.5, 2905)):
            Rectangle(F4_W_3, F4_H_4)
        with Locations((-1474.5, 856)):
            Rectangle(F4_W_3, F4_H_5)
        with Locations((-874.5, 2905)):
            Rectangle(F4_W_3, F4_H_4)
        with Locations((-874.5, 856)):
            Rectangle(F4_W_3, F4_H_5)
        with Locations((-274.5, 2905)):
            Rectangle(F4_W_3, F4_H_4)
        with Locations((-274.5, 856)):
            Rectangle(F4_W_3, F4_H_5)
    extrude(amount=F5_DEPTH)

    # F6 (on face) → F7 (cut, through all)
    with BuildSketch(Plane(origin=(0, 14400, 0), x_dir=(-1, 0, 0), z_dir=(0, 1, 0))):
        Polygon((-400, 3200), (-400, 2900), (12, 2995.1176947437), (12, 3245.1176947437), (-422, 3245.1176947437), (-422, 2894.9208997952), (-412, 2897.2295817065), (-412, 3200), align=None)
        Polygon((-412, 2897.2295817065), (-400, 2900), (-400, 3200), (-412, 3200), align=None)
        Polygon((-452, 2887.9948540615), (-422, 2894.9208997952), (-422, 3245.1176947437), (-452, 3245.1176947437), align=None)
    extrude(amount=-F7_DEPTH, mode=Mode.SUBTRACT)

    # F8 (on face) → F9 (join)
    with BuildSketch(Plane(origin=(0, 0, 0), x_dir=(1, 0, 0), z_dir=(0, 0, -1))):
        with Locations((206, -7200)):
            Rectangle(F8_W, F8_H)
    extrude(amount=F9_DEPTH)


solid = f1_1.part
